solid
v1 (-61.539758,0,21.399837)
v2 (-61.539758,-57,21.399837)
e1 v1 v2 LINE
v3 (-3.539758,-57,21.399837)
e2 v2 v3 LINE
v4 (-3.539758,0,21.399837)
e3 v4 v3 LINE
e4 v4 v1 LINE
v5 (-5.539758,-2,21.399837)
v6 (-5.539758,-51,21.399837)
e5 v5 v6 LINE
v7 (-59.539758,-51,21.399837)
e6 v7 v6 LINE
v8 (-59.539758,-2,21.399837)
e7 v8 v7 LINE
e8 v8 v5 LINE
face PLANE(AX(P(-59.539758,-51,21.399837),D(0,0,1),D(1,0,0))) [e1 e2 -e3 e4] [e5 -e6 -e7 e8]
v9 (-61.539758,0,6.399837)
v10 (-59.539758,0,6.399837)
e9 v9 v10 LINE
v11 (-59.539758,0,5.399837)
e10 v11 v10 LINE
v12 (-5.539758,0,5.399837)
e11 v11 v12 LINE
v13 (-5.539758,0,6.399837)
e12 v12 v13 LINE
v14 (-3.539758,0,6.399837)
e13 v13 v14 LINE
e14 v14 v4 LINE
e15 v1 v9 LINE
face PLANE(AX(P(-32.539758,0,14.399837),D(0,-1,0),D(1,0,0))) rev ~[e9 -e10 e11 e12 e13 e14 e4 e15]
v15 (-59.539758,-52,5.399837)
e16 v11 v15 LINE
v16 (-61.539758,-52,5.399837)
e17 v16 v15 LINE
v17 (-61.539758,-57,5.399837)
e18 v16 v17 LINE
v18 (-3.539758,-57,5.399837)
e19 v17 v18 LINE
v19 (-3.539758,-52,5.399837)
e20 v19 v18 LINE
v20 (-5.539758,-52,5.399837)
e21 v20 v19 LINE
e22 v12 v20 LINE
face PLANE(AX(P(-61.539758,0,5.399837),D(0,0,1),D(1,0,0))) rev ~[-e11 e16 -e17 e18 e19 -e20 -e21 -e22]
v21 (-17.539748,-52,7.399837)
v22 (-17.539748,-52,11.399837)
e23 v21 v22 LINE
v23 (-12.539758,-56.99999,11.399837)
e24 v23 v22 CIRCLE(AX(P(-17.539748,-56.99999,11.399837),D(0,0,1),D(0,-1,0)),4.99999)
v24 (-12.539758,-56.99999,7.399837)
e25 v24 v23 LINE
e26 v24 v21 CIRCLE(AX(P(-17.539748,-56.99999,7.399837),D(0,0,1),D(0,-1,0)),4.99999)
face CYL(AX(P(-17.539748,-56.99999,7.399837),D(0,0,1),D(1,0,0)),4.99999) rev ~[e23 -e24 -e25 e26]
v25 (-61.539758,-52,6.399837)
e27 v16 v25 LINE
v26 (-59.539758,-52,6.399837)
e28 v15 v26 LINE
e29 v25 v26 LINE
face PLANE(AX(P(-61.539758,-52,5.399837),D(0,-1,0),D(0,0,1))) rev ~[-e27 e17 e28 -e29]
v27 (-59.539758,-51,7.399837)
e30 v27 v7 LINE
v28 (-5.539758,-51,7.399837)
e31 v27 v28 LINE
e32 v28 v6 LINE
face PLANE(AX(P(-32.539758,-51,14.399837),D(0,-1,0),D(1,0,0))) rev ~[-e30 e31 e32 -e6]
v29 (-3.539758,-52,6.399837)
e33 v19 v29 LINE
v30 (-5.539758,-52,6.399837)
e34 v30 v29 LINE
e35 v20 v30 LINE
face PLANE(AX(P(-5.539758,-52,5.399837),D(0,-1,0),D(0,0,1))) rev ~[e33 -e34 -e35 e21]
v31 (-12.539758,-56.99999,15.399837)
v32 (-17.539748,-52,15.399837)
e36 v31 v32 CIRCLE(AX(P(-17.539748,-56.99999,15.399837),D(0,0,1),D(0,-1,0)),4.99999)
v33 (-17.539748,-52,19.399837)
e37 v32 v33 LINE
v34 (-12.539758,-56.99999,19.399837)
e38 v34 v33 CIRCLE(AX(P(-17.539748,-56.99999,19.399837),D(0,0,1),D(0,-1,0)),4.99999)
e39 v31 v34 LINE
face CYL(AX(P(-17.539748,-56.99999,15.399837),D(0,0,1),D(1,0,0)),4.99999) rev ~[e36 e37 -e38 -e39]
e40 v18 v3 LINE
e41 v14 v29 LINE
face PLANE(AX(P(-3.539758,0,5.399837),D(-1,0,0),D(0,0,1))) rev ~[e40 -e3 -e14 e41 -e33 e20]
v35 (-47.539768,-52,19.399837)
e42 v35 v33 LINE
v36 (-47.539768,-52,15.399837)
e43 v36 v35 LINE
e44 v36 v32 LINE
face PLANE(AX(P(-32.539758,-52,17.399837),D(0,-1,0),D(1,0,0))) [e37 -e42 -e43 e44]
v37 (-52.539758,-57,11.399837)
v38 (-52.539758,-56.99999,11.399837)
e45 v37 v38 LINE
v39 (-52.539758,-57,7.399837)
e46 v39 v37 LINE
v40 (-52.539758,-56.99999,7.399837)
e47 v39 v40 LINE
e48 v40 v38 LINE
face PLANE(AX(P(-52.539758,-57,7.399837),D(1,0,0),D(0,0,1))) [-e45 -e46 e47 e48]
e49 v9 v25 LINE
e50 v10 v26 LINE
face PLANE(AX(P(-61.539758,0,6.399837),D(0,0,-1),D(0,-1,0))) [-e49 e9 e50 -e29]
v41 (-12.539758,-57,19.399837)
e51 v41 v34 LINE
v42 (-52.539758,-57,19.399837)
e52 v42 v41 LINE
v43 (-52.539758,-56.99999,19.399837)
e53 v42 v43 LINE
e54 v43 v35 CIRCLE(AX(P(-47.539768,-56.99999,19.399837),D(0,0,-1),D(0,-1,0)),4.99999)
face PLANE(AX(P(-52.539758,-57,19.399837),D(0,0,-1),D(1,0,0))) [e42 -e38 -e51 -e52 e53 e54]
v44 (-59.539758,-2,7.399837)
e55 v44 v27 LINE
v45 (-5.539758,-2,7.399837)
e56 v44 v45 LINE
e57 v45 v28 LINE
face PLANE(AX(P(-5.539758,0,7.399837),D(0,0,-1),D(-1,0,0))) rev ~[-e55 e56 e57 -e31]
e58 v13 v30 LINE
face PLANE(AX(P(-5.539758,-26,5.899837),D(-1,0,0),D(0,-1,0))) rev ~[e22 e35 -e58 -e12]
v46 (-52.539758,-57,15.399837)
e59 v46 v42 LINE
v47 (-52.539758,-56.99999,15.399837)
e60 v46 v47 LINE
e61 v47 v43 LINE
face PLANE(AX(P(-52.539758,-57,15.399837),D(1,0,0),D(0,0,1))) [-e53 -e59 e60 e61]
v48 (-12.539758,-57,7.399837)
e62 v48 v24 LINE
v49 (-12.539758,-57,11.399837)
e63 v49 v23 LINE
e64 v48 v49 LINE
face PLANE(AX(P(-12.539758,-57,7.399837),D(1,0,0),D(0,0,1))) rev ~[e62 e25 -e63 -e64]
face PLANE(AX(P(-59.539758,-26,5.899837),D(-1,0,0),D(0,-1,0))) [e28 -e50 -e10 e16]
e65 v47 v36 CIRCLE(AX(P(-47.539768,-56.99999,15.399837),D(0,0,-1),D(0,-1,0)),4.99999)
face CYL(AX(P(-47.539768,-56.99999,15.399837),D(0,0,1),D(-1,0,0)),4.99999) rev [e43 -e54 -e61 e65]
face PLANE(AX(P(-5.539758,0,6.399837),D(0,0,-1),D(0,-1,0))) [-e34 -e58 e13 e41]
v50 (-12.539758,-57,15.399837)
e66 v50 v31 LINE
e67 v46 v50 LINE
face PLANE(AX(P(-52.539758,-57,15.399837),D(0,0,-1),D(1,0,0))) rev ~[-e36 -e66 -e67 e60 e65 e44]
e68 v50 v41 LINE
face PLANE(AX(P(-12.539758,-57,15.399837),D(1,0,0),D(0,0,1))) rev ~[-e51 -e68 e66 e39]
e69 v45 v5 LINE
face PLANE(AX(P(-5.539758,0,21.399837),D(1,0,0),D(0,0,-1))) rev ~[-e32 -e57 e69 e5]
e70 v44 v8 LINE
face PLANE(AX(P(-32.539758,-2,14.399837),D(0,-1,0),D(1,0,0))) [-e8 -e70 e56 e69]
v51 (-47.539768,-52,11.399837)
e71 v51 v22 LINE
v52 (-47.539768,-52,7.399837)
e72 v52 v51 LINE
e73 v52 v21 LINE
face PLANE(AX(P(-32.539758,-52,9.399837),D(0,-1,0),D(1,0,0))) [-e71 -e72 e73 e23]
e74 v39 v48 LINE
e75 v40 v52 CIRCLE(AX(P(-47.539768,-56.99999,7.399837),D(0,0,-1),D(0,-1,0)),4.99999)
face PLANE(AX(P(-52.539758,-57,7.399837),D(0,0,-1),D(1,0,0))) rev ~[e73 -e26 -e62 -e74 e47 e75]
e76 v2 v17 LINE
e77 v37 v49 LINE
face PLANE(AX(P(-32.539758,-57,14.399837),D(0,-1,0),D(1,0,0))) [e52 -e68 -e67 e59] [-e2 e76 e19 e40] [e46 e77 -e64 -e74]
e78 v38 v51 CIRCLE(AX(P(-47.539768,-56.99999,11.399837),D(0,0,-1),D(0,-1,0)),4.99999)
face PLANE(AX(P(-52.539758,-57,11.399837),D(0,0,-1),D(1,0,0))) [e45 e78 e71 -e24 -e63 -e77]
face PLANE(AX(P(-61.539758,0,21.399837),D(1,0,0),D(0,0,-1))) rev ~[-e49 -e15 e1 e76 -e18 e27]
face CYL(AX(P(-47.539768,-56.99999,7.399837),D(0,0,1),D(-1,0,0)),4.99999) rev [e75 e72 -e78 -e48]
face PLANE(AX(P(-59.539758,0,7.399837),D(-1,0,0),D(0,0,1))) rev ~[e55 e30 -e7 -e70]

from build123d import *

# Parameters (mm, degrees)
F1_DEPTH = 57
F0_W     = 54
F0_H     = 14
F2_DEPTH = 2
F3_START = 51
F3_DEPTH = 6
F4_W     = 40
F4_H     = 4
F5_DEPTH = 5
F6_R     = 4.99999
F7_W     = 52
F7_H     = 1
F8_DEPTH = 2
F9_START = -56
F9_DEPTH = 2


# Not quite as in the source:
# - a fillet or chamfer is up to 0.001 mm smaller than in the source, because OpenCascade refuses the exact size


with BuildPart() as f1:
    # F0 (on Front) → F1 (new body)
    with BuildSketch(Plane.XZ):
        Polygon((-59.5397581918, 21.3998371276), (-61.5397581918, 21.3998371276), (-61.5397581918, 5.3998371276), (-3.5397581918, 5.3998371276), (-3.5397581918, 21.3998371276), (-5.5397581918, 21.3998371276), (-5.5397581918, 7.3998371276), (-59.5397581918, 7.3998371276), align=None)
    extrude(amount=F1_DEPTH)

    # F0 (on Front) → F2 (join)
    with BuildSketch(Plane.XZ):
        with Locations((-32.5397581918, 14.3998371276)):
            Rectangle(F0_W, F0_H)
    extrude(amount=F2_DEPTH)

    # F0 (on Front) → F3 (join)
    with BuildSketch(Plane.XZ.offset(F3_START)):
        with Locations((-32.5397581918, 14.3998371276)):
            Rectangle(F0_W, F0_H)
    extrude(amount=F3_DEPTH)

    # F4 (on face) → F5 (cut)
    with BuildSketch(Plane.XZ.offset(57)):
        with Locations((-32.5397581918, 17.3998371276)):
            Rectangle(F4_W, F4_H)
        with Locations((-32.5397581918, 9.3998371276)):
            Rectangle(F4_W, F4_H)
    extrude(amount=-F5_DEPTH, mode=Mode.SUBTRACT)

    # F6 (radius 5 in the source; OpenCascade refuses exactly that, so slightly less here)
    f6_edges = [f1.edges().sort_by_distance(p)[0] for p in [
        (-52.539758, -52, 17.399837),
        (-52.539758, -52, 9.399837),
        (-12.539758, -52, 17.399837),
        (-12.539758, -52, 9.399837),
    ]]
    fillet(f6_edges, radius=F6_R)

    # F7 (on face) → F8 (cut)
    with BuildSketch(Plane(origin=(-61.5397581918, 0, 0), x_dir=(0, -1, 0), z_dir=(-1, 0, 0))):
        with Locations((26, 5.8998371276)):
            Rectangle(F7_W, F7_H)
    extrude(amount=-F8_DEPTH, mode=Mode.SUBTRACT)

    # F7 (on face) → F9 (cut)
    with BuildSketch(Plane(origin=(-61.5397581918, 0, 0), x_dir=(0, -1, 0), z_dir=(-1, 0, 0)).offset(F9_START)):
        with Locations((26, 5.8998371276)):
            Rectangle(F7_W, F7_H)
    extrude(amount=-F9_DEPTH, mode=Mode.SUBTRACT)


solid = f1.part
